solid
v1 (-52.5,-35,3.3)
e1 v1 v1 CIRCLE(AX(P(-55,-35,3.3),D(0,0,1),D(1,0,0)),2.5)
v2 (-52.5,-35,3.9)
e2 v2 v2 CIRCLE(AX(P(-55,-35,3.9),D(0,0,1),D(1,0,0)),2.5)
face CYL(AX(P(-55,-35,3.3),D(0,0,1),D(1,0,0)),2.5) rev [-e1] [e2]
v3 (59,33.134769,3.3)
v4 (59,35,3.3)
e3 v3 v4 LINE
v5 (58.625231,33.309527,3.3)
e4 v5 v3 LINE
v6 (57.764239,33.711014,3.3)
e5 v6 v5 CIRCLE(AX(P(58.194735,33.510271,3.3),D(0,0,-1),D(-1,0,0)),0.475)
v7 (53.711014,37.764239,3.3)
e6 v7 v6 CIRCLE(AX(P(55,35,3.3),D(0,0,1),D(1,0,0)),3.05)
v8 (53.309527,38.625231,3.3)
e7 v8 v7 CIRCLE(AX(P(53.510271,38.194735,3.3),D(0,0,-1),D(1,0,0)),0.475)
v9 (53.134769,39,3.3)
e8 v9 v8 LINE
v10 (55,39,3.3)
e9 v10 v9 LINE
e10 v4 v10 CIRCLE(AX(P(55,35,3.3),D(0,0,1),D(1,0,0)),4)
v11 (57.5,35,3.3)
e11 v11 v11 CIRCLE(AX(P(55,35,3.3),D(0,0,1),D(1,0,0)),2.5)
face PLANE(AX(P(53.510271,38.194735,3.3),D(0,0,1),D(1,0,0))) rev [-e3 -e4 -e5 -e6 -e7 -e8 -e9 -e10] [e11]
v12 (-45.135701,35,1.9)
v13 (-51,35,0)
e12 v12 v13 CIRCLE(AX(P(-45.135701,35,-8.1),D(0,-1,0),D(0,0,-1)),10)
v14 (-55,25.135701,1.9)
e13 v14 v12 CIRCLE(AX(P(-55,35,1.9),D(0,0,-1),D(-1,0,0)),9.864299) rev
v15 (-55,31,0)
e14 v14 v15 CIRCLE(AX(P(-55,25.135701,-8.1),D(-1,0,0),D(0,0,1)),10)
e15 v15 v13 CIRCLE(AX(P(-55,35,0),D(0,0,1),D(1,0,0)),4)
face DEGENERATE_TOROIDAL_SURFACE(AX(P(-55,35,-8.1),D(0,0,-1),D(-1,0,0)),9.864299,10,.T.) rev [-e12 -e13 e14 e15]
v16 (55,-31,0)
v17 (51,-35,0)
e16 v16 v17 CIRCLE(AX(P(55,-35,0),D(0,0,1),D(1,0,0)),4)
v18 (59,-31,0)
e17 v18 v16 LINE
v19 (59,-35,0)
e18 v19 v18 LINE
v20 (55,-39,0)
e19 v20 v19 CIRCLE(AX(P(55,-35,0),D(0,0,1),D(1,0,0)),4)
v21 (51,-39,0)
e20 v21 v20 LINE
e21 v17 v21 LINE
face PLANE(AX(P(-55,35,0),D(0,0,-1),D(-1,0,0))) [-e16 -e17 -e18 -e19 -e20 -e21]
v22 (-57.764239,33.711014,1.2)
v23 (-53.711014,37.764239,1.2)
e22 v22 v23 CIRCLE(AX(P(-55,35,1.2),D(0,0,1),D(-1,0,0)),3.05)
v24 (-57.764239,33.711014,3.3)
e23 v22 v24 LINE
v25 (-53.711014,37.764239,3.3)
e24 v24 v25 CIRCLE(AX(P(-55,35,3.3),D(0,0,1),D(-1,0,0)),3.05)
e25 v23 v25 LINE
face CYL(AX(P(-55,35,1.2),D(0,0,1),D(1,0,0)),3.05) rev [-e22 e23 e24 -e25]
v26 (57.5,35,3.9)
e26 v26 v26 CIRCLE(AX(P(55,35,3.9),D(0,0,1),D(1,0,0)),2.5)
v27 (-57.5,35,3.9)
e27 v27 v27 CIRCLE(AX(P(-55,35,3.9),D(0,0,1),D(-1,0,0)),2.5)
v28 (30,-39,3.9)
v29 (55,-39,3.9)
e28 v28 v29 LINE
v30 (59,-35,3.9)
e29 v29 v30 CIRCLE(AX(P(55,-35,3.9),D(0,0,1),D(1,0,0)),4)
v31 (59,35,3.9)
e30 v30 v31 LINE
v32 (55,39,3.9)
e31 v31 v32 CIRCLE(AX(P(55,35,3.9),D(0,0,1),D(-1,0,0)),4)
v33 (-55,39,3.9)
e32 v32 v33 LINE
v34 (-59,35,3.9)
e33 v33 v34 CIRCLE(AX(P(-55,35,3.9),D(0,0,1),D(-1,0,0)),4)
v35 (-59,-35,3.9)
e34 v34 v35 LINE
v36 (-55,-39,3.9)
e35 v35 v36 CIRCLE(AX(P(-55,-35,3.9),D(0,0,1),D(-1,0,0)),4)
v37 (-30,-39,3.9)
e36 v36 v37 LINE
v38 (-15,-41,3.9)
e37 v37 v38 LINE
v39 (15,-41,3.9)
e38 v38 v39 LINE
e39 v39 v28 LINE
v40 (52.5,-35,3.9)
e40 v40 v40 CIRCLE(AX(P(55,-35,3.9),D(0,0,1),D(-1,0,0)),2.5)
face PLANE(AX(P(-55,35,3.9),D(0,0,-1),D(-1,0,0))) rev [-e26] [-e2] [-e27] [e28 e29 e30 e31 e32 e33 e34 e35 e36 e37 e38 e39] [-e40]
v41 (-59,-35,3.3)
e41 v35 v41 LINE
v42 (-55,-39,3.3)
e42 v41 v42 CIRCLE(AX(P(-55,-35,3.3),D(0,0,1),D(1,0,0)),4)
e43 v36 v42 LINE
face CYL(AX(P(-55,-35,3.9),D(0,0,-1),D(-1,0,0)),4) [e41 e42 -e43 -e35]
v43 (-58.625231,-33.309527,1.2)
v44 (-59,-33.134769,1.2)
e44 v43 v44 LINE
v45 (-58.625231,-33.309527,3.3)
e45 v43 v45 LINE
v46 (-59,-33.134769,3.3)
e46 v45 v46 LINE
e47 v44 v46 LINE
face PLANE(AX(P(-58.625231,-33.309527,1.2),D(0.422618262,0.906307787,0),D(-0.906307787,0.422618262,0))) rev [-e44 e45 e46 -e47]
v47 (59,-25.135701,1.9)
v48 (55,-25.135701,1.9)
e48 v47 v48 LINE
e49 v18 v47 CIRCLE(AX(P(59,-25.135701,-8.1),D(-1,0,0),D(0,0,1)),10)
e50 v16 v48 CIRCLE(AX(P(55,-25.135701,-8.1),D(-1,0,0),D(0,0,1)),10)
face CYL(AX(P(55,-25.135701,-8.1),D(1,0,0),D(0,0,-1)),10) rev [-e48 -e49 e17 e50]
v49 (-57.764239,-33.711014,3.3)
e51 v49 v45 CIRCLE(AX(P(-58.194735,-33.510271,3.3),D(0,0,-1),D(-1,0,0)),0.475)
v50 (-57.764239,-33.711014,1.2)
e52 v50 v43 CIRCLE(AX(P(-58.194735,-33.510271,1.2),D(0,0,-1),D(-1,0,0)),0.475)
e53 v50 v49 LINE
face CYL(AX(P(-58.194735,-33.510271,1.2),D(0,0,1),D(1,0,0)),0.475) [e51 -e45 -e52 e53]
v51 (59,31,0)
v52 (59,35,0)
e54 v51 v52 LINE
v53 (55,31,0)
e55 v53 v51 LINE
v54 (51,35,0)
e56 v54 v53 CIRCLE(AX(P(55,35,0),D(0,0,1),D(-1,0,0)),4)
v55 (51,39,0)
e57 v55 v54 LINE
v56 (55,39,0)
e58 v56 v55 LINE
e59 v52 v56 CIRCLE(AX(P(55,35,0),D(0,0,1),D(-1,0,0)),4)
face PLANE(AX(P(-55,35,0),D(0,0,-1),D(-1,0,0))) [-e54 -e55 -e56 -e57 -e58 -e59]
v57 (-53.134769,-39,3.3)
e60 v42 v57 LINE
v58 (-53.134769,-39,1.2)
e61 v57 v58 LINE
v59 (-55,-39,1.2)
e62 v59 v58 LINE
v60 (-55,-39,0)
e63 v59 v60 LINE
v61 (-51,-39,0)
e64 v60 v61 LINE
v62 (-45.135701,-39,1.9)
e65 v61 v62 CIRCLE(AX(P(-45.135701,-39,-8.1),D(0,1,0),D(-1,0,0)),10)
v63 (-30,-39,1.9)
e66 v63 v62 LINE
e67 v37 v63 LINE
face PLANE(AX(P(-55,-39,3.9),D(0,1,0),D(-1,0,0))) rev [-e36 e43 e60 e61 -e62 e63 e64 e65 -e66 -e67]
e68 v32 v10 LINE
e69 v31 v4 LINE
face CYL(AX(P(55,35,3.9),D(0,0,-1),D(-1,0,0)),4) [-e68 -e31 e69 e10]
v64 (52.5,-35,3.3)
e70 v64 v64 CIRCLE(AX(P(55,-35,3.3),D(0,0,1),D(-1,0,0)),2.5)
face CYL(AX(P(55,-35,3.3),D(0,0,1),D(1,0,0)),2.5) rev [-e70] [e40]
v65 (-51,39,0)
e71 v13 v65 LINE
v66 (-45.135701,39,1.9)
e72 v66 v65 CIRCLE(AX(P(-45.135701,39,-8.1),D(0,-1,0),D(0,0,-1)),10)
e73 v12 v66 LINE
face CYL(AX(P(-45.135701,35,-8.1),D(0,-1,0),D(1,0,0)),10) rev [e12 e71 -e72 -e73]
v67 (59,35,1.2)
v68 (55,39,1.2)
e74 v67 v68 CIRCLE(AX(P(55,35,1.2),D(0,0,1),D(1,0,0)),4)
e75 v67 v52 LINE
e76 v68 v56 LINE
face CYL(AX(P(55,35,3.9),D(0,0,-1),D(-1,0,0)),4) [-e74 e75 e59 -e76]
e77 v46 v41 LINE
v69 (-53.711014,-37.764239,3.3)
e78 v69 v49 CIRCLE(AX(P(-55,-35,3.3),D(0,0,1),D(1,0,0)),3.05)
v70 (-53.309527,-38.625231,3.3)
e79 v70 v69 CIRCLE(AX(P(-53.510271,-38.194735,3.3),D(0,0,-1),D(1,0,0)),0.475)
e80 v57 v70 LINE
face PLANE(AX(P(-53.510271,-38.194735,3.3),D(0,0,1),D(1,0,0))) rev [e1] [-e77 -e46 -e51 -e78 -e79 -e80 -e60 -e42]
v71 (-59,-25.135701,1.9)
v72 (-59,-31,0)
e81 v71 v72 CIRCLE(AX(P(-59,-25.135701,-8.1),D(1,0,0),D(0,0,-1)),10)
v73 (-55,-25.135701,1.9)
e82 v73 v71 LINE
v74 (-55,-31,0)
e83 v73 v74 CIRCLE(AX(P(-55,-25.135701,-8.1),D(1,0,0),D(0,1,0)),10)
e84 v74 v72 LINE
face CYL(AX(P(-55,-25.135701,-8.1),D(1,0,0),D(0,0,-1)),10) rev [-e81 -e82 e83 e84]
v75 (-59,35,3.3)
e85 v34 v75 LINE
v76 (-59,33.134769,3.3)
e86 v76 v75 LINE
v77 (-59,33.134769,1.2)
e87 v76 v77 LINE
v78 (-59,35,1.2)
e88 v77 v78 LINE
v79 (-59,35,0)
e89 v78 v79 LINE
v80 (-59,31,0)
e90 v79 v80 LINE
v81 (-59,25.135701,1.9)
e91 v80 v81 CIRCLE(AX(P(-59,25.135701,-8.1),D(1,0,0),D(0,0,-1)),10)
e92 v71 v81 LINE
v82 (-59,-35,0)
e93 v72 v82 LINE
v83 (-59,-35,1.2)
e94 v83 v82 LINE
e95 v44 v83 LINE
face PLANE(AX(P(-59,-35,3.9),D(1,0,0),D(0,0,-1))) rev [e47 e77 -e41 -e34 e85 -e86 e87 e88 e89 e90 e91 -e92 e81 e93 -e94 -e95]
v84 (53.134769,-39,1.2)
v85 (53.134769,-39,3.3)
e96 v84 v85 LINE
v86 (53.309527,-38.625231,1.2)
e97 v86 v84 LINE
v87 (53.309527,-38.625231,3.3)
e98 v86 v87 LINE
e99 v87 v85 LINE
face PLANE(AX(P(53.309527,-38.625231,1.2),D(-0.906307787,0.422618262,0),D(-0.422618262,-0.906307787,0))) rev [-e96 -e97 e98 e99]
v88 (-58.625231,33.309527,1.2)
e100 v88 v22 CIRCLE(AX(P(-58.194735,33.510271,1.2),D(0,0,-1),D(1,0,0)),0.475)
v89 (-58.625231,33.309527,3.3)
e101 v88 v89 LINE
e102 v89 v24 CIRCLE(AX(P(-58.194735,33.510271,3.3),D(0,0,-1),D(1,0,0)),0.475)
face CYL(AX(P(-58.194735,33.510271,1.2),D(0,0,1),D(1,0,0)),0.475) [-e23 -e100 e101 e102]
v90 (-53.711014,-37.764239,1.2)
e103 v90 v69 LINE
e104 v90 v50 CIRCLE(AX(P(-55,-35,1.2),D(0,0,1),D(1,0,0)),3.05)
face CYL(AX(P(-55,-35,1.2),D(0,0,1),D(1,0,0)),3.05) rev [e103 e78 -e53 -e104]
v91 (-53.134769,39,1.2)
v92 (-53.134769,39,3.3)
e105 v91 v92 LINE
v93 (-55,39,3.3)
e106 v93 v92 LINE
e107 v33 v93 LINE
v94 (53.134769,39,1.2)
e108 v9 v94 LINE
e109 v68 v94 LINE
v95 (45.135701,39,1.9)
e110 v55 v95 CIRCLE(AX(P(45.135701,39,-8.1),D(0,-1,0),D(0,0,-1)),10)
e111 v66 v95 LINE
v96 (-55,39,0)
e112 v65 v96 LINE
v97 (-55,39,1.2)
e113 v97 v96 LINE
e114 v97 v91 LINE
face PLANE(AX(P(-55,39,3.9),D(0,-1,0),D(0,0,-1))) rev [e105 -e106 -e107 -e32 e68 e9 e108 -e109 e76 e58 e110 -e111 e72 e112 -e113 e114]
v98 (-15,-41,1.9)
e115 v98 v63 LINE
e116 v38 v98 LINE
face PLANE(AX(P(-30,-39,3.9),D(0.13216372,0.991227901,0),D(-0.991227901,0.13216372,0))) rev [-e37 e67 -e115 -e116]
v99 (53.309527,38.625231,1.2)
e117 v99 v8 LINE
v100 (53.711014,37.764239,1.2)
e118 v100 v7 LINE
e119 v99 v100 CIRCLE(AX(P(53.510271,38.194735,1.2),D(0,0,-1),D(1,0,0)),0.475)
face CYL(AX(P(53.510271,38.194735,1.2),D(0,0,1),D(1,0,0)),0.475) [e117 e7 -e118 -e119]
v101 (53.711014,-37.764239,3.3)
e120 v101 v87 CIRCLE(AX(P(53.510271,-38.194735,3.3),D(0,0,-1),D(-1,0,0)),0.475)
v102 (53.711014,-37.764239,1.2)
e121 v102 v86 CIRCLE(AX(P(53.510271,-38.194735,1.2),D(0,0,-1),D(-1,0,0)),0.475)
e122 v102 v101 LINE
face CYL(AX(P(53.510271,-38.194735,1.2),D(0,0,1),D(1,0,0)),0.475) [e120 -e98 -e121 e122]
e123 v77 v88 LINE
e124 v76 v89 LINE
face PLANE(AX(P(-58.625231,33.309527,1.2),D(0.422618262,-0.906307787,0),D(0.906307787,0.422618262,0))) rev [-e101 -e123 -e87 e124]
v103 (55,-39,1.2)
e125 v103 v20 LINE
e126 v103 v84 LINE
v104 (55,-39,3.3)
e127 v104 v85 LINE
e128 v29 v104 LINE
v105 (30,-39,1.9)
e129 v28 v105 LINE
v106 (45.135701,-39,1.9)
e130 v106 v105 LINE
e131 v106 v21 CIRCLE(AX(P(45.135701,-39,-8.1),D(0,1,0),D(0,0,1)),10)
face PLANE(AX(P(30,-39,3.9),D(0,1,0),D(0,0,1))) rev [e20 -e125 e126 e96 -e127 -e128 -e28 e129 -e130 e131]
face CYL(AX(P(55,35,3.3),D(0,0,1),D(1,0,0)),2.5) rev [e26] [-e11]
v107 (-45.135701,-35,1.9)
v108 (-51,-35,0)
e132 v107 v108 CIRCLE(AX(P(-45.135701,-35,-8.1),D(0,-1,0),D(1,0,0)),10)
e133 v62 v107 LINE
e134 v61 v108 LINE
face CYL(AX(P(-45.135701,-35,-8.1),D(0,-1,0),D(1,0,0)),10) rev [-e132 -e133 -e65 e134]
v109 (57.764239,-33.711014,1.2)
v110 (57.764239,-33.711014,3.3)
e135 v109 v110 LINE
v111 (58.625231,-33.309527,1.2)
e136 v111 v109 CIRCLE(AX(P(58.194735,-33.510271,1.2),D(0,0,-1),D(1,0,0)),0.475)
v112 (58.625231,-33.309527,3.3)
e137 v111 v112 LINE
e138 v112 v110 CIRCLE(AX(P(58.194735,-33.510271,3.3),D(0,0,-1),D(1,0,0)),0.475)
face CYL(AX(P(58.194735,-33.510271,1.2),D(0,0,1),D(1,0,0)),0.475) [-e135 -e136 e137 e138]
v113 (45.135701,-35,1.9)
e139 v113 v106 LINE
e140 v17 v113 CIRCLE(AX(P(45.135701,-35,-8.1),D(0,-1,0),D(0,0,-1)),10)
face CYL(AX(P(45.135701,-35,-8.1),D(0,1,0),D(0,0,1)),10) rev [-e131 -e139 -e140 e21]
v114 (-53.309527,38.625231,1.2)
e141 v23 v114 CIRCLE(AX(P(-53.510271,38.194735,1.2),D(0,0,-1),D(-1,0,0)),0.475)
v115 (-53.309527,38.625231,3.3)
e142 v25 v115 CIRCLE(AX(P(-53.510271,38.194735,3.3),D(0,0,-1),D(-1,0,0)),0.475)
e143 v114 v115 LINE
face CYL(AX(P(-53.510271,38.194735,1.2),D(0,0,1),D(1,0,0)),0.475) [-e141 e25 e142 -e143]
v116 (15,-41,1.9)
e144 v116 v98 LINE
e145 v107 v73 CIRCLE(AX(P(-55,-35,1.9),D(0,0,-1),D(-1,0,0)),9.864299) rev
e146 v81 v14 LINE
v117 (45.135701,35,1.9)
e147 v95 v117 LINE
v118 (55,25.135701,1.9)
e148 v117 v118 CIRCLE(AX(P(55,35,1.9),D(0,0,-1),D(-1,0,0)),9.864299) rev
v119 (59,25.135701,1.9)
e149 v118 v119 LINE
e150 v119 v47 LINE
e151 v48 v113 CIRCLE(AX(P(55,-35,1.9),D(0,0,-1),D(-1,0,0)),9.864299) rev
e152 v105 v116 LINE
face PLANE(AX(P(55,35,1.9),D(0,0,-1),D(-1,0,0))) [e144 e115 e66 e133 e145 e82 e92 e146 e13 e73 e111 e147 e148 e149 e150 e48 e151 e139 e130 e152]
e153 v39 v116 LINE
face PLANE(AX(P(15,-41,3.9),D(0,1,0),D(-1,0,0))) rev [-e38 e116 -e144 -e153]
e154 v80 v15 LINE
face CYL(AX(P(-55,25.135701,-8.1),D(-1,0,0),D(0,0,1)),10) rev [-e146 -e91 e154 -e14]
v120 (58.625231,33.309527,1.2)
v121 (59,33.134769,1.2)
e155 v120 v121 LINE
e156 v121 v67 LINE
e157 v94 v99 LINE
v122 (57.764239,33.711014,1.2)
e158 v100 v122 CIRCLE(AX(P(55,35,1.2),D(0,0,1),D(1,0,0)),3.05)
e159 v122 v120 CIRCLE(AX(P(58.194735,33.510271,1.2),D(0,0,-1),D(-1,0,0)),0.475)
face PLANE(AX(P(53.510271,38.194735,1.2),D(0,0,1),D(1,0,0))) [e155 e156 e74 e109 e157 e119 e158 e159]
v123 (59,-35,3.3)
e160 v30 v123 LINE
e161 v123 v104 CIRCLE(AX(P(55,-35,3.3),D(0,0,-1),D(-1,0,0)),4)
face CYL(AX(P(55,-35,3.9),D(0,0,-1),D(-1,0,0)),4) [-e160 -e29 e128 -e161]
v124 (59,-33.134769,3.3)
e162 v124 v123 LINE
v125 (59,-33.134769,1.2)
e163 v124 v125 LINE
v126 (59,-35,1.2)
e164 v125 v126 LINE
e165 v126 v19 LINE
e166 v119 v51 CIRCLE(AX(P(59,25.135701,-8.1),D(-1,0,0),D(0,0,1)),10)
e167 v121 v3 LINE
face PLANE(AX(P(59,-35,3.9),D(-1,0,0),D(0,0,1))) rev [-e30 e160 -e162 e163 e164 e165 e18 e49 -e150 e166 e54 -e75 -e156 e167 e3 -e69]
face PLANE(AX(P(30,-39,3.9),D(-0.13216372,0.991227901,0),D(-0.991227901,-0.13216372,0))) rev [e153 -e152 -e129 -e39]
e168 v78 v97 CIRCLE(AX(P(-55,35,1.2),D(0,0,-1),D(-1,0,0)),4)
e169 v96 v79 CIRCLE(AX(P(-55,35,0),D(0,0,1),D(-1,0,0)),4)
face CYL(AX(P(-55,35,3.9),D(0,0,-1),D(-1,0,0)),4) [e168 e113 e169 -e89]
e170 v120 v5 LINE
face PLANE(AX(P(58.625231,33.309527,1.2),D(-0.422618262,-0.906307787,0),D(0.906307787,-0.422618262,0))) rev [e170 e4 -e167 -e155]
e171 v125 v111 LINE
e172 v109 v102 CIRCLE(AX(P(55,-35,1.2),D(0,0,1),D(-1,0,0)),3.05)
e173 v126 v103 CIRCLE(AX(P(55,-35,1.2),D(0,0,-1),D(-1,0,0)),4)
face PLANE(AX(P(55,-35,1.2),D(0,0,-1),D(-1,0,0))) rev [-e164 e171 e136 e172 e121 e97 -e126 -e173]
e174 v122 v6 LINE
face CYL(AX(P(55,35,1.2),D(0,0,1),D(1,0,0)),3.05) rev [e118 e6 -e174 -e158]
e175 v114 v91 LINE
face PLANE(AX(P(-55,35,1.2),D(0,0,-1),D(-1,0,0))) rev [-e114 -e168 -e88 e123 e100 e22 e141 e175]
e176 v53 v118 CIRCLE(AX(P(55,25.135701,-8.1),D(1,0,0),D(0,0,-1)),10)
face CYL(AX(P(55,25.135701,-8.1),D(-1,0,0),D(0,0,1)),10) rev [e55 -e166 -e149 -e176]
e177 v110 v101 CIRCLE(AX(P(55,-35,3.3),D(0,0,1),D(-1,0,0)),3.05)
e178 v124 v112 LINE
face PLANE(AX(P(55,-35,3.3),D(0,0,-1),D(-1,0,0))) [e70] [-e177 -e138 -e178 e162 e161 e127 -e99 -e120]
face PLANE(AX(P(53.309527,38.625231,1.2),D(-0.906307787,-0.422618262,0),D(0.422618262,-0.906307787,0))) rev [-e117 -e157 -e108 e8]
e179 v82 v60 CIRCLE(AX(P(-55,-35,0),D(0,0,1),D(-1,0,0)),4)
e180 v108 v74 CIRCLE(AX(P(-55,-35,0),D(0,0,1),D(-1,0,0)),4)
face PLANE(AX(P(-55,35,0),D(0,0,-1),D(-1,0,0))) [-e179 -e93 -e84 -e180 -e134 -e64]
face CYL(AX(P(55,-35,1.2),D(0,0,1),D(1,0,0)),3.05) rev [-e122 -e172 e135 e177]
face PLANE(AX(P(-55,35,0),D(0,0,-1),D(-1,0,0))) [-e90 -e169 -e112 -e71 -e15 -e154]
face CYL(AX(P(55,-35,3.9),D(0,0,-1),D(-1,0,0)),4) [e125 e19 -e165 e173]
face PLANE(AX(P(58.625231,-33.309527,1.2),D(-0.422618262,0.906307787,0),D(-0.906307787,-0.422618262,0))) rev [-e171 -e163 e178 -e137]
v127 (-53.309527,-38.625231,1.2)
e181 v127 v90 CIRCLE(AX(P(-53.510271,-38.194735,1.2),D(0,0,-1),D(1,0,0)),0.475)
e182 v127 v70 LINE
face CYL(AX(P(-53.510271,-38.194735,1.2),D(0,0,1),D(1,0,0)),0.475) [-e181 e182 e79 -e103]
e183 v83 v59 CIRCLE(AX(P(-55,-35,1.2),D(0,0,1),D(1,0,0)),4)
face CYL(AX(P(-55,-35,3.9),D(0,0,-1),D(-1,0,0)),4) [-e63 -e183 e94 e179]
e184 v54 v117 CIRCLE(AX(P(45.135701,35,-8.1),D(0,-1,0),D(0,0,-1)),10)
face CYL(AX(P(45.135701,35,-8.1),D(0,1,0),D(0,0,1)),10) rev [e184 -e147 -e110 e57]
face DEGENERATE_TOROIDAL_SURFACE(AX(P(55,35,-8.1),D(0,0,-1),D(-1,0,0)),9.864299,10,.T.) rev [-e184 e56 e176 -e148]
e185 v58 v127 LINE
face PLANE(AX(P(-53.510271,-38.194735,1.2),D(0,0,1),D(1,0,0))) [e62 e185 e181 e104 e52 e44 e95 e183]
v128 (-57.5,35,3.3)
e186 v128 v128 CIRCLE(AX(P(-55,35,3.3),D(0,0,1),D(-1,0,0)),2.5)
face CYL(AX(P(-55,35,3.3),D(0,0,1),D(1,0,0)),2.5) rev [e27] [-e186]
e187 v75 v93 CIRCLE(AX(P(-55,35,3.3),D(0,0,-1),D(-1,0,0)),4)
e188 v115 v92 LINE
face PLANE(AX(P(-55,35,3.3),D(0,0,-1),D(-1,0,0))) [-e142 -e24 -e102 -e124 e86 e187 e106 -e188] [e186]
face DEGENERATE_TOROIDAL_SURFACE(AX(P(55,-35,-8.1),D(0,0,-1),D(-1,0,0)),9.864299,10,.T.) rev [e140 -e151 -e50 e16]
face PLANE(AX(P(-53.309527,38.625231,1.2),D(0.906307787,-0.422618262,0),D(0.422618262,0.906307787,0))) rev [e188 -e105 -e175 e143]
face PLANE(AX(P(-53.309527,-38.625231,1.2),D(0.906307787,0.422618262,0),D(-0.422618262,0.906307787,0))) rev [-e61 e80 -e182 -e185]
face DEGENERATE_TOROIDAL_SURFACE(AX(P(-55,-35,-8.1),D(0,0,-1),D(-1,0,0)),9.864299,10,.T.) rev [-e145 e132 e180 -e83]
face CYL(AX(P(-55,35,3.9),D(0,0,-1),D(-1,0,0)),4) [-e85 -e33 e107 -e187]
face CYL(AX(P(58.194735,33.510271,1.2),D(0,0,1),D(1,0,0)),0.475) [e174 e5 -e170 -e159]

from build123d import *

# Parameters (mm, degrees)
EXTRUDE_1_DEPTH     = 3.9
SKETCH_2_R          = 2.5
CUT_EXTRUDE_1_DEPTH = 0.6
CUT_EXTRUDE_2_DEPTH = 2.1
CUT_EXTRUDE_4_DEPTH = 1.9
FILLET_2_R          = 10


with BuildPart() as part:
    # 草图1 → 凸台-拉伸1 (new body)
    with BuildSketch(Plane.XY):
        with BuildLine():
            Line((-55, -39), (-30, -39))
            Line((-30, -39), (-15, -41))
            Line((-15, -41), (15, -41))
            Line((15, -41), (30, -39))
            Line((30, -39), (55, -39))
            ThreePointArc((55, -39), (57.828427125, -37.828427125), (59, -35))
            Line((59, -35), (59, 35))
            ThreePointArc((59, 35), (57.828427125, 37.828427125), (55, 39))
            Line((55, 39), (-55, 39))
            ThreePointArc((-55, 39), (-57.828427125, 37.828427125), (-59, 35))
            Line((-59, 35), (-59, -35))
            ThreePointArc((-59, -35), (-57.828427125, -37.828427125), (-55, -39))
        make_face()
    extrude(amount=EXTRUDE_1_DEPTH)

    # 草图2 → 切除-拉伸1 (cut)
    with BuildSketch(Plane.XY.offset(3.9)):
        with Locations((55, 35)):
            Circle(SKETCH_2_R)
        with Locations(Location((-55, 35, 0), (0, 0, 180))):
            Circle(SKETCH_2_R)
        with Locations(Location((55, -35, 0), (0, 0, 180))):
            Circle(SKETCH_2_R)
        with Locations((-55, -35)):
            Circle(SKETCH_2_R)
    extrude(amount=-CUT_EXTRUDE_1_DEPTH, mode=Mode.SUBTRACT)

    # 草图3 → 切除-拉伸2 (cut)
    with BuildSketch(Plane.XY.offset(3.3)):
        with BuildLine():
            Line((53.309526953, 38.625231148), (52.886908691, 39.531538935))
            ThreePointArc((52.886908691, 39.531538935), (58.535533906, 38.535533906), (59.531538935, 32.886908691))
            Line((59.531538935, 32.886908691), (58.625231148, 33.309526953))
            ThreePointArc((58.625231148, 33.309526953), (58.395478624, 33.940766826), (57.76423875, 33.711014302))
            ThreePointArc((57.76423875, 33.711014302), (52.843324317, 32.843324317), (53.711014302, 37.76423875))
            ThreePointArc((53.711014302, 37.76423875), (53.940766826, 38.395478624), (53.309526953, 38.625231148))
        make_face()
        with BuildLine():
            Line((-58.625231148, 33.309526953), (-59.531538935, 32.886908691))
            ThreePointArc((-59.531538935, 32.886908691), (-58.535533906, 38.535533906), (-52.886908691, 39.531538935))
            Line((-52.886908691, 39.531538935), (-53.309526953, 38.625231148))
            ThreePointArc((-53.309526953, 38.625231148), (-53.940766826, 38.395478624), (-53.711014302, 37.76423875))
            ThreePointArc((-53.711014302, 37.76423875), (-52.843324317, 32.843324317), (-57.76423875, 33.711014302))
            ThreePointArc((-57.76423875, 33.711014302), (-58.395478624, 33.940766826), (-58.625231148, 33.309526953))
        make_face()
        with BuildLine():
            Line((-53.309526953, -38.625231148), (-52.886908691, -39.531538935))
            ThreePointArc((-52.886908691, -39.531538935), (-58.535533906, -38.535533906), (-59.531538935, -32.886908691))
            Line((-59.531538935, -32.886908691), (-58.625231148, -33.309526953))
            ThreePointArc((-58.625231148, -33.309526953), (-58.395478624, -33.940766826), (-57.76423875, -33.711014302))
            ThreePointArc((-57.76423875, -33.711014302), (-52.843324317, -32.843324317), (-53.711014302, -37.76423875))
            ThreePointArc((-53.711014302, -37.76423875), (-53.940766826, -38.395478624), (-53.309526953, -38.625231148))
        make_face()
        with BuildLine():
            Line((58.625231148, -33.309526953), (59.531538935, -32.886908691))
            ThreePointArc((59.531538935, -32.886908691), (58.535533906, -38.535533906), (52.886908691, -39.531538935))
            Line((52.886908691, -39.531538935), (53.309526953, -38.625231148))
            ThreePointArc((53.309526953, -38.625231148), (53.940766826, -38.395478624), (53.711014302, -37.76423875))
            ThreePointArc((53.711014302, -37.76423875), (52.843324317, -32.843324317), (57.76423875, -33.711014302))
            ThreePointArc((57.76423875, -33.711014302), (58.395478624, -33.940766826), (58.625231148, -33.309526953))
        make_face()
    extrude(amount=-CUT_EXTRUDE_2_DEPTH, mode=Mode.SUBTRACT)

    # 草图5 → 切除-拉伸4 (cut)
    with BuildSketch(Plane(origin=(0, 0, 0), x_dir=(-1, 0, 0), z_dir=(0, 0, -1))):
        with BuildLine():
            Line((-51, 35), (-51, 39))
            Line((-51, 39), (51, 39))
            Line((51, 39), (51, 35))
            ThreePointArc((51, 35), (52.171572875, 32.171572875), (55, 31))
            Line((55, 31), (59, 31))
            Line((59, 31), (59, -31))
            Line((59, -31), (55, -31))
            ThreePointArc((55, -31), (52.171572875, -32.171572875), (51, -35))
            Line((51, -35), (51, -39))
            Line((51, -39), (30, -39))
            Line((30, -39), (15, -41))
            Line((15, -41), (-15, -41))
            Line((-15, -41), (-30, -39))
            Line((-30, -39), (-51, -39))
            Line((-51, -39), (-51, -35))
            ThreePointArc((-51, -35), (-52.171572875, -32.171572875), (-55, -31))
            Line((-55, -31), (-59, -31))
            Line((-59, -31), (-59, 31))
            Line((-59, 31), (-55, 31))
            ThreePointArc((-55, 31), (-52.171572875, 32.171572875), (-51, 35))
        make_face()
    extrude(amount=-CUT_EXTRUDE_4_DEPTH, mode=Mode.SUBTRACT)

    # 圆角2
    # the kernel refuses this fillet: 10 mm, written as the material it adds along each edge
    with BuildSketch(Plane(origin=(-59, -31, 1.9), x_dir=(0, 1, 0), z_dir=(1, 0, 0)), Plane(origin=(-51, 39, 1.9), x_dir=(1, 0, 0), z_dir=(0, -1, 0)), Plane(origin=(55, -31, 1.9), x_dir=(0, 1, 0), z_dir=(1, 0, 0)), Plane(origin=(51, 35, 1.9), x_dir=(-1, 0, 0), z_dir=(0, 1, 0)), Plane(origin=(59, 31, 1.9), x_dir=(0, -1, 0), z_dir=(-1, 0, 0)), Plane(origin=(-55, 31, 1.9), x_dir=(0, -1, 0), z_dir=(-1, 0, 0)), Plane(origin=(51, -39, 1.9), x_dir=(-1, 0, 0), z_dir=(0, 1, 0))) as fillet_2_piece_1:
        with BuildLine():
            CenterArc((5.864298765, -10), FILLET_2_R, 90, 35.904068583)
            Line((0, -1.9), (-0.117285975, -1.738))
            ThreePointArc((-0.117285975, -1.738), (-0.2, -0.95), (-0.2, 0))
            Line((-0.2, 0), (0, 0.2))
            Line((0, 0.2), (5.864298765, 0.2))
            Line((5.864298765, 0.2), (5.864298765, 0))
        make_face()
    extrude(amount=4)
    with BuildSketch(Plane(origin=(-55, -35, 1.9), x_dir=(0, 1, 0), z_dir=(-1, 0, 0))) as fillet_2_piece_2:
        with BuildLine():
            CenterArc((9.864298765, 10), FILLET_2_R, 234.095931417, 35.904068583)
            Line((4, 1.9), (3.882714025, 1.738))
            ThreePointArc((3.882714025, 1.738), (3.8, 0.95), (3.8, 0))
            Line((3.8, 0), (4, -0.2))
            Line((4, -0.2), (9.864298765, -0.2))
            Line((9.864298765, -0.2), (9.864298765, 0))
        make_face()
    revolve(axis=Axis((-55, -35, 1.9), (0, 0, -1)), revolution_arc=90)
    with BuildSketch(Plane(origin=(-55, 35, 1.9), x_dir=(1, 0, 0), z_dir=(0, 1, 0))) as fillet_2_piece_3:
        with BuildLine():
            CenterArc((9.864298765, 10), FILLET_2_R, 234.095931417, 35.904068583)
            Line((4, 1.9), (3.882714025, 1.738))
            ThreePointArc((3.882714025, 1.738), (3.8, 0.95), (3.8, 0))
            Line((3.8, 0), (4, -0.2))
            Line((4, -0.2), (9.864298765, -0.2))
            Line((9.864298765, -0.2), (9.864298765, 0))
        make_face()
    revolve(axis=Axis((-55, 35, 1.9), (0, 0, -1)), revolution_arc=90)
    with BuildSketch(Plane(origin=(55, -35, 1.9), x_dir=(-1, 0, 0), z_dir=(0, -1, 0))) as fillet_2_piece_4:
        with BuildLine():
            CenterArc((9.864298765, 10), FILLET_2_R, 234.095931417, 35.904068583)
            Line((4, 1.9), (3.882714025, 1.738))
            ThreePointArc((3.882714025, 1.738), (3.8, 0.95), (3.8, 0))
            Line((3.8, 0), (4, -0.2))
            Line((4, -0.2), (9.864298765, -0.2))
            Line((9.864298765, -0.2), (9.864298765, 0))
        make_face()
    revolve(axis=Axis((55, -35, 1.9), (0, 0, -1)), revolution_arc=90)
    with BuildSketch(Plane(origin=(-51, -35, 1.9), x_dir=(0, 0, -1), z_dir=(0, -1, 0))) as fillet_2_piece_5:
        with BuildLine():
            CenterArc((10, 5.864298765), FILLET_2_R, 180, 35.904068583)
            Line((0, 5.864298765), (-0.2, 5.864298765))
            Line((-0.2, 5.864298765), (-0.2, 0))
            Line((-0.2, 0), (0, -0.2))
            ThreePointArc((0, -0.2), (0.95, -0.2), (1.738, -0.117285975))
            Line((1.738, -0.117285975), (1.9, 0))
        make_face()
    extrude(amount=4)
    with BuildSketch(Plane(origin=(55, 35, 1.9), x_dir=(0, -1, 0), z_dir=(1, 0, 0))) as fillet_2_piece_6:
        with BuildLine():
            CenterArc((9.864298765, 10), FILLET_2_R, 234.095931417, 35.904068583)
            Line((4, 1.9), (3.882714025, 1.738))
            ThreePointArc((3.882714025, 1.738), (3.8, 0.95), (3.8, 0))
            Line((3.8, 0), (4, -0.2))
            Line((4, -0.2), (9.864298765, -0.2))
            Line((9.864298765, -0.2), (9.864298765, 0))
        make_face()
    revolve(axis=Axis((55, 35, 1.9), (0, 0, -1)), revolution_arc=90)


solid = part.part
